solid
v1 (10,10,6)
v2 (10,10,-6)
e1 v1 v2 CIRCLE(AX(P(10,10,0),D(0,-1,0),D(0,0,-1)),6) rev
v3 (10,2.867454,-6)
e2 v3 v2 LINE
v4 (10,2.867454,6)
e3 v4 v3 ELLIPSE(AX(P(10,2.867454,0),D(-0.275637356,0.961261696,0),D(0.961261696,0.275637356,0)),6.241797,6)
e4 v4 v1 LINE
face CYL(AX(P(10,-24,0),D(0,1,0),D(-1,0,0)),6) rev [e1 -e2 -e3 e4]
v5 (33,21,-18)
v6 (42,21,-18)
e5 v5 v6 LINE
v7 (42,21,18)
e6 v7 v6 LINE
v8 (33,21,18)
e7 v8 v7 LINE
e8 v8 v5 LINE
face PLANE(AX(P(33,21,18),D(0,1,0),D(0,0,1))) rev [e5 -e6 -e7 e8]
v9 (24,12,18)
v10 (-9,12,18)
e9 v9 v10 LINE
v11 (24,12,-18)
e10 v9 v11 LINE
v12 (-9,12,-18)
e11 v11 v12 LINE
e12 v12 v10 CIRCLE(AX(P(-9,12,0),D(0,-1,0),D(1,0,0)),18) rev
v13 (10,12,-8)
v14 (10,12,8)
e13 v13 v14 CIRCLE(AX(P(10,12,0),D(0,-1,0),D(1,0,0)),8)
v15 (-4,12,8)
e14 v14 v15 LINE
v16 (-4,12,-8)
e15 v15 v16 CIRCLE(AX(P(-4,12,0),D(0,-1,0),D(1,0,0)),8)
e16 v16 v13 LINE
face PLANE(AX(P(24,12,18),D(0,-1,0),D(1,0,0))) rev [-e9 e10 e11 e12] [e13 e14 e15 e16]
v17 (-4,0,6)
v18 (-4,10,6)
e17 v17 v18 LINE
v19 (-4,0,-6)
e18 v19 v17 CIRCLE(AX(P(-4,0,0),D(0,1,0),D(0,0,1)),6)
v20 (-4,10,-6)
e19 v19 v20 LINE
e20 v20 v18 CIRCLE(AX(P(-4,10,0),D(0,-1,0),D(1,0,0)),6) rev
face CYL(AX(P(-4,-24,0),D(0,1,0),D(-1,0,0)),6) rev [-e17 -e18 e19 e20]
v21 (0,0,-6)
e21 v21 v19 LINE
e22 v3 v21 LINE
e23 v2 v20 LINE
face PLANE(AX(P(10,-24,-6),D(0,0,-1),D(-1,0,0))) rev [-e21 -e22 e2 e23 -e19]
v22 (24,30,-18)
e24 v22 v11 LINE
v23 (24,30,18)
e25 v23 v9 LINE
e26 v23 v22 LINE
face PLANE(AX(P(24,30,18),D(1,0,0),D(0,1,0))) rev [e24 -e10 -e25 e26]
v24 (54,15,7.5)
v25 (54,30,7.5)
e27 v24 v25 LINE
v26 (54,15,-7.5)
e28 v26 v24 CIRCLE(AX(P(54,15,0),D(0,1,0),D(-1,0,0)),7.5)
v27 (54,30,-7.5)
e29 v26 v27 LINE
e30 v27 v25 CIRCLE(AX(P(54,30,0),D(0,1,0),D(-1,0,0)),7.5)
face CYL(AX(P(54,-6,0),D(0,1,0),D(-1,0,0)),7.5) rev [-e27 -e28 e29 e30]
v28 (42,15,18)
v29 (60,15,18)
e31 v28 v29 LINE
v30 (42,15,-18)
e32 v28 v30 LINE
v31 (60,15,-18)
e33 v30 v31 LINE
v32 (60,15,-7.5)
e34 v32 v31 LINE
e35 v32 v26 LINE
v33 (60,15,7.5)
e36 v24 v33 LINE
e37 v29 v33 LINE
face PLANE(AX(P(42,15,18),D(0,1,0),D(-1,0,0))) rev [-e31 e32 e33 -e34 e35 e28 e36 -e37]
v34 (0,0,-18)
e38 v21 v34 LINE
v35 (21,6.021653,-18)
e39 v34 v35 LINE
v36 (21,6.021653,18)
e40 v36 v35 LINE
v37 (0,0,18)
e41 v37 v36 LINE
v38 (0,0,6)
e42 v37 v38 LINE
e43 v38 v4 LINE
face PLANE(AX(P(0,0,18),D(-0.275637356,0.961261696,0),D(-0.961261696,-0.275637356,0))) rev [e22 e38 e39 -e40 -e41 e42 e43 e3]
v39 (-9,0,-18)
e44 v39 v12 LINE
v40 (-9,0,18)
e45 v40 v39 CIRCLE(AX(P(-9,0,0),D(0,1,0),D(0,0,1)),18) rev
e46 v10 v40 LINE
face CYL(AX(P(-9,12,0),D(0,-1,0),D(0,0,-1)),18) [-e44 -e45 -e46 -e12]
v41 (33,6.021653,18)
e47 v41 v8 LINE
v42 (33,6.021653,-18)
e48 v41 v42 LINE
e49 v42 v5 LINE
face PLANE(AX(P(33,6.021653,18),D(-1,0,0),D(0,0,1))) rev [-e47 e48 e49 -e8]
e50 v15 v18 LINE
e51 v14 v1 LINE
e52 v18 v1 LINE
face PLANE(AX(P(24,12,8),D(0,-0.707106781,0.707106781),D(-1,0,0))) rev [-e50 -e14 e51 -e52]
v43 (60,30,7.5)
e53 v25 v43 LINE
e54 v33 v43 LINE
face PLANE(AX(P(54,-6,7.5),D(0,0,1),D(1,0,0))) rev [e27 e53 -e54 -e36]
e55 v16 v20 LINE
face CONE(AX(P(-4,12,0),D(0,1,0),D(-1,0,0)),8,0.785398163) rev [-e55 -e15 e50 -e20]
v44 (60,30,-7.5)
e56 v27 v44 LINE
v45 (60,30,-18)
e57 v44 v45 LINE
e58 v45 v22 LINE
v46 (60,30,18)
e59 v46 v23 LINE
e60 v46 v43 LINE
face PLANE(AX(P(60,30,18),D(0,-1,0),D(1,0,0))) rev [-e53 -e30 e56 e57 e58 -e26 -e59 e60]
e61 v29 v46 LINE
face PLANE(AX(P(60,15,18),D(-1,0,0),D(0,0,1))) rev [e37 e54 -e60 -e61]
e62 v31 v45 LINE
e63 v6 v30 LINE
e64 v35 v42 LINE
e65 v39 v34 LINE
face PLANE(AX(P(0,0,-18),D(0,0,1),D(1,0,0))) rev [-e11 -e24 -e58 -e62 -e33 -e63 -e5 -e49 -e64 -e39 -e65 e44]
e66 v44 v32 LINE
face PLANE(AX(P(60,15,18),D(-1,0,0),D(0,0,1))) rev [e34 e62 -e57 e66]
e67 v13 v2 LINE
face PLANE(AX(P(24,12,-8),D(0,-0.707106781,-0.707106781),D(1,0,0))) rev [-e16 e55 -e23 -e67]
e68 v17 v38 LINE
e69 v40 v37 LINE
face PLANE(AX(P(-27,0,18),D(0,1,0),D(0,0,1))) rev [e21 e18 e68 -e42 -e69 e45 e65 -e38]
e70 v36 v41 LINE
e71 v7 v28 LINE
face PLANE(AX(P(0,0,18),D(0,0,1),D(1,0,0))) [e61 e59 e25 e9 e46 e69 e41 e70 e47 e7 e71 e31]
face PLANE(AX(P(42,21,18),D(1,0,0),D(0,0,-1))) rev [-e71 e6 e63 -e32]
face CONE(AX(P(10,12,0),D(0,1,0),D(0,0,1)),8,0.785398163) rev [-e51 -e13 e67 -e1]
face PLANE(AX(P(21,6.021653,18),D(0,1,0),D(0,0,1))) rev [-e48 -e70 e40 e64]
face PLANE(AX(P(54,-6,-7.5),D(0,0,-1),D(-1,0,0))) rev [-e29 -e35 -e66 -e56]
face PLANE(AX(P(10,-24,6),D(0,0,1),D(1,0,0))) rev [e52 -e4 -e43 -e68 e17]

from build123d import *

# Parameters (mm, degrees)
BOSS_EXTRUDE1_DEPTH = 18
FILLET1_RADIUS      = 18
FILLET1_LENGTH      = 12
CUT_EXTRUDE1_DEPTH  = 36
CUT_EXTRUDE2_DEPTH  = 36


with BuildPart() as part:
    # Sketch1 → Boss-Extrude1 (new, symmetric)
    with BuildSketch(Plane.XY):
        Polygon((-27, 12), (-27, 0), (0, 0), (21, 6.021653101), (33, 6.021653101), (33, 21), (42, 21), (42, 15), (60, 15), (60, 30), (24, 30), (24, 12), align=None)
    extrude(amount=BOSS_EXTRUDE1_DEPTH, both=True)

    # Fillet1: full round fillet: the end face becomes a half cylinder, R = half its width
    fillet1_face = Plane((-27, 6, 0), x_dir=(0, -1, 0), z_dir=(-1, 0, 0))  # on the end face: x along it, z out of the body
    fillet1_slab = fillet1_face.offset(-FILLET1_RADIUS / 2) * Box(FILLET1_LENGTH, 2 * FILLET1_RADIUS, FILLET1_RADIUS, mode=Mode.PRIVATE)  # the body's end, R deep
    fillet1_round = Plane((-9, 6, 0), x_dir=(-1, 0, 0), z_dir=(0, -1, 0)) * Cylinder(FILLET1_RADIUS, FILLET1_LENGTH, mode=Mode.PRIVATE)  # its axis R under the face
    add(fillet1_slab - fillet1_round, mode=Mode.SUBTRACT)

    # Sketch3 → Cut-Extrude1 (cut)
    with BuildSketch(Plane(origin=(0, 12, 0), x_dir=(1, 0, 0), z_dir=(0, 1, 0))):
        with BuildLine():
            Line((10, -6), (-4, -6))
            ThreePointArc((-4, -6), (-10, 0), (-4, 6))
            Line((-4, 6), (10, 6))
            ThreePointArc((10, 6), (16, 0), (10, -6))
        make_face()
    extrude(amount=-CUT_EXTRUDE1_DEPTH, mode=Mode.SUBTRACT)

    # Chamfer1: read off the stored shape, not the designer's step
    # Chamfer1: loft between two sections, ruled curve by curve
    chamfer1_from = [
        Edge.make_three_point_arc((10, 10, 6), (14.242640687, 10, 4.242640687), (16, 10, 0)),
        Edge.make_three_point_arc((16, 10, 0), (14.242640687, 10, -4.242640687), (10, 10, -6)),
        Edge.make_three_point_arc((-4, 10, -6), (-8.242640687, 10, -4.242640687), (-10, 10, 0)),
        Edge.make_three_point_arc((-10, 10, 0), (-8.242640687, 10, 4.242640687), (-4, 10, 6)),
        Edge.make_line((-4, 10, 6), (10, 10, 6)),
        Edge.make_line((10, 10, -6), (-4, 10, -6)),
    ]
    chamfer1_to = [
        Edge.make_three_point_arc((10, 12, 8), (15.656854249, 12, 5.656854249), (18, 12, 0)),
        Edge.make_three_point_arc((18, 12, 0), (15.656854249, 12, -5.656854249), (10, 12, -8)),
        Edge.make_three_point_arc((-4, 12, -8), (-9.656854249, 12, -5.656854249), (-12, 12, 0)),
        Edge.make_three_point_arc((-12, 12, 0), (-9.656854249, 12, 5.656854249), (-4, 12, 8)),
        Edge.make_line((-4, 12, 8), (10, 12, 8)),
        Edge.make_line((10, 12, -8), (-4, 12, -8)),
    ]
    chamfer1 = Solid(Shell([*[Face.make_surface_from_curves(chamfer1_from[k], chamfer1_to[k]) for k in range(6)], Face(Wire(chamfer1_from)), Face(Wire(chamfer1_to))]))
    add(chamfer1, mode=Mode.SUBTRACT)

    # Sketch4 → Cut-Extrude2 (cut)
    with BuildSketch(Plane(origin=(0, 30, 0), x_dir=(1, 0, 0), z_dir=(0, 1, 0))):
        with BuildLine():
            Line((54, 7.5), (65.591333802, 7.5))
            ThreePointArc((65.591333802, 7.5), (73.091333802, 0), (65.591333802, -7.5))
            Line((65.591333802, -7.5), (54, -7.5))
            ThreePointArc((54, -7.5), (46.5, 0), (54, 7.5))
        make_face()
    extrude(amount=-CUT_EXTRUDE2_DEPTH, mode=Mode.SUBTRACT)


solid = part.part
